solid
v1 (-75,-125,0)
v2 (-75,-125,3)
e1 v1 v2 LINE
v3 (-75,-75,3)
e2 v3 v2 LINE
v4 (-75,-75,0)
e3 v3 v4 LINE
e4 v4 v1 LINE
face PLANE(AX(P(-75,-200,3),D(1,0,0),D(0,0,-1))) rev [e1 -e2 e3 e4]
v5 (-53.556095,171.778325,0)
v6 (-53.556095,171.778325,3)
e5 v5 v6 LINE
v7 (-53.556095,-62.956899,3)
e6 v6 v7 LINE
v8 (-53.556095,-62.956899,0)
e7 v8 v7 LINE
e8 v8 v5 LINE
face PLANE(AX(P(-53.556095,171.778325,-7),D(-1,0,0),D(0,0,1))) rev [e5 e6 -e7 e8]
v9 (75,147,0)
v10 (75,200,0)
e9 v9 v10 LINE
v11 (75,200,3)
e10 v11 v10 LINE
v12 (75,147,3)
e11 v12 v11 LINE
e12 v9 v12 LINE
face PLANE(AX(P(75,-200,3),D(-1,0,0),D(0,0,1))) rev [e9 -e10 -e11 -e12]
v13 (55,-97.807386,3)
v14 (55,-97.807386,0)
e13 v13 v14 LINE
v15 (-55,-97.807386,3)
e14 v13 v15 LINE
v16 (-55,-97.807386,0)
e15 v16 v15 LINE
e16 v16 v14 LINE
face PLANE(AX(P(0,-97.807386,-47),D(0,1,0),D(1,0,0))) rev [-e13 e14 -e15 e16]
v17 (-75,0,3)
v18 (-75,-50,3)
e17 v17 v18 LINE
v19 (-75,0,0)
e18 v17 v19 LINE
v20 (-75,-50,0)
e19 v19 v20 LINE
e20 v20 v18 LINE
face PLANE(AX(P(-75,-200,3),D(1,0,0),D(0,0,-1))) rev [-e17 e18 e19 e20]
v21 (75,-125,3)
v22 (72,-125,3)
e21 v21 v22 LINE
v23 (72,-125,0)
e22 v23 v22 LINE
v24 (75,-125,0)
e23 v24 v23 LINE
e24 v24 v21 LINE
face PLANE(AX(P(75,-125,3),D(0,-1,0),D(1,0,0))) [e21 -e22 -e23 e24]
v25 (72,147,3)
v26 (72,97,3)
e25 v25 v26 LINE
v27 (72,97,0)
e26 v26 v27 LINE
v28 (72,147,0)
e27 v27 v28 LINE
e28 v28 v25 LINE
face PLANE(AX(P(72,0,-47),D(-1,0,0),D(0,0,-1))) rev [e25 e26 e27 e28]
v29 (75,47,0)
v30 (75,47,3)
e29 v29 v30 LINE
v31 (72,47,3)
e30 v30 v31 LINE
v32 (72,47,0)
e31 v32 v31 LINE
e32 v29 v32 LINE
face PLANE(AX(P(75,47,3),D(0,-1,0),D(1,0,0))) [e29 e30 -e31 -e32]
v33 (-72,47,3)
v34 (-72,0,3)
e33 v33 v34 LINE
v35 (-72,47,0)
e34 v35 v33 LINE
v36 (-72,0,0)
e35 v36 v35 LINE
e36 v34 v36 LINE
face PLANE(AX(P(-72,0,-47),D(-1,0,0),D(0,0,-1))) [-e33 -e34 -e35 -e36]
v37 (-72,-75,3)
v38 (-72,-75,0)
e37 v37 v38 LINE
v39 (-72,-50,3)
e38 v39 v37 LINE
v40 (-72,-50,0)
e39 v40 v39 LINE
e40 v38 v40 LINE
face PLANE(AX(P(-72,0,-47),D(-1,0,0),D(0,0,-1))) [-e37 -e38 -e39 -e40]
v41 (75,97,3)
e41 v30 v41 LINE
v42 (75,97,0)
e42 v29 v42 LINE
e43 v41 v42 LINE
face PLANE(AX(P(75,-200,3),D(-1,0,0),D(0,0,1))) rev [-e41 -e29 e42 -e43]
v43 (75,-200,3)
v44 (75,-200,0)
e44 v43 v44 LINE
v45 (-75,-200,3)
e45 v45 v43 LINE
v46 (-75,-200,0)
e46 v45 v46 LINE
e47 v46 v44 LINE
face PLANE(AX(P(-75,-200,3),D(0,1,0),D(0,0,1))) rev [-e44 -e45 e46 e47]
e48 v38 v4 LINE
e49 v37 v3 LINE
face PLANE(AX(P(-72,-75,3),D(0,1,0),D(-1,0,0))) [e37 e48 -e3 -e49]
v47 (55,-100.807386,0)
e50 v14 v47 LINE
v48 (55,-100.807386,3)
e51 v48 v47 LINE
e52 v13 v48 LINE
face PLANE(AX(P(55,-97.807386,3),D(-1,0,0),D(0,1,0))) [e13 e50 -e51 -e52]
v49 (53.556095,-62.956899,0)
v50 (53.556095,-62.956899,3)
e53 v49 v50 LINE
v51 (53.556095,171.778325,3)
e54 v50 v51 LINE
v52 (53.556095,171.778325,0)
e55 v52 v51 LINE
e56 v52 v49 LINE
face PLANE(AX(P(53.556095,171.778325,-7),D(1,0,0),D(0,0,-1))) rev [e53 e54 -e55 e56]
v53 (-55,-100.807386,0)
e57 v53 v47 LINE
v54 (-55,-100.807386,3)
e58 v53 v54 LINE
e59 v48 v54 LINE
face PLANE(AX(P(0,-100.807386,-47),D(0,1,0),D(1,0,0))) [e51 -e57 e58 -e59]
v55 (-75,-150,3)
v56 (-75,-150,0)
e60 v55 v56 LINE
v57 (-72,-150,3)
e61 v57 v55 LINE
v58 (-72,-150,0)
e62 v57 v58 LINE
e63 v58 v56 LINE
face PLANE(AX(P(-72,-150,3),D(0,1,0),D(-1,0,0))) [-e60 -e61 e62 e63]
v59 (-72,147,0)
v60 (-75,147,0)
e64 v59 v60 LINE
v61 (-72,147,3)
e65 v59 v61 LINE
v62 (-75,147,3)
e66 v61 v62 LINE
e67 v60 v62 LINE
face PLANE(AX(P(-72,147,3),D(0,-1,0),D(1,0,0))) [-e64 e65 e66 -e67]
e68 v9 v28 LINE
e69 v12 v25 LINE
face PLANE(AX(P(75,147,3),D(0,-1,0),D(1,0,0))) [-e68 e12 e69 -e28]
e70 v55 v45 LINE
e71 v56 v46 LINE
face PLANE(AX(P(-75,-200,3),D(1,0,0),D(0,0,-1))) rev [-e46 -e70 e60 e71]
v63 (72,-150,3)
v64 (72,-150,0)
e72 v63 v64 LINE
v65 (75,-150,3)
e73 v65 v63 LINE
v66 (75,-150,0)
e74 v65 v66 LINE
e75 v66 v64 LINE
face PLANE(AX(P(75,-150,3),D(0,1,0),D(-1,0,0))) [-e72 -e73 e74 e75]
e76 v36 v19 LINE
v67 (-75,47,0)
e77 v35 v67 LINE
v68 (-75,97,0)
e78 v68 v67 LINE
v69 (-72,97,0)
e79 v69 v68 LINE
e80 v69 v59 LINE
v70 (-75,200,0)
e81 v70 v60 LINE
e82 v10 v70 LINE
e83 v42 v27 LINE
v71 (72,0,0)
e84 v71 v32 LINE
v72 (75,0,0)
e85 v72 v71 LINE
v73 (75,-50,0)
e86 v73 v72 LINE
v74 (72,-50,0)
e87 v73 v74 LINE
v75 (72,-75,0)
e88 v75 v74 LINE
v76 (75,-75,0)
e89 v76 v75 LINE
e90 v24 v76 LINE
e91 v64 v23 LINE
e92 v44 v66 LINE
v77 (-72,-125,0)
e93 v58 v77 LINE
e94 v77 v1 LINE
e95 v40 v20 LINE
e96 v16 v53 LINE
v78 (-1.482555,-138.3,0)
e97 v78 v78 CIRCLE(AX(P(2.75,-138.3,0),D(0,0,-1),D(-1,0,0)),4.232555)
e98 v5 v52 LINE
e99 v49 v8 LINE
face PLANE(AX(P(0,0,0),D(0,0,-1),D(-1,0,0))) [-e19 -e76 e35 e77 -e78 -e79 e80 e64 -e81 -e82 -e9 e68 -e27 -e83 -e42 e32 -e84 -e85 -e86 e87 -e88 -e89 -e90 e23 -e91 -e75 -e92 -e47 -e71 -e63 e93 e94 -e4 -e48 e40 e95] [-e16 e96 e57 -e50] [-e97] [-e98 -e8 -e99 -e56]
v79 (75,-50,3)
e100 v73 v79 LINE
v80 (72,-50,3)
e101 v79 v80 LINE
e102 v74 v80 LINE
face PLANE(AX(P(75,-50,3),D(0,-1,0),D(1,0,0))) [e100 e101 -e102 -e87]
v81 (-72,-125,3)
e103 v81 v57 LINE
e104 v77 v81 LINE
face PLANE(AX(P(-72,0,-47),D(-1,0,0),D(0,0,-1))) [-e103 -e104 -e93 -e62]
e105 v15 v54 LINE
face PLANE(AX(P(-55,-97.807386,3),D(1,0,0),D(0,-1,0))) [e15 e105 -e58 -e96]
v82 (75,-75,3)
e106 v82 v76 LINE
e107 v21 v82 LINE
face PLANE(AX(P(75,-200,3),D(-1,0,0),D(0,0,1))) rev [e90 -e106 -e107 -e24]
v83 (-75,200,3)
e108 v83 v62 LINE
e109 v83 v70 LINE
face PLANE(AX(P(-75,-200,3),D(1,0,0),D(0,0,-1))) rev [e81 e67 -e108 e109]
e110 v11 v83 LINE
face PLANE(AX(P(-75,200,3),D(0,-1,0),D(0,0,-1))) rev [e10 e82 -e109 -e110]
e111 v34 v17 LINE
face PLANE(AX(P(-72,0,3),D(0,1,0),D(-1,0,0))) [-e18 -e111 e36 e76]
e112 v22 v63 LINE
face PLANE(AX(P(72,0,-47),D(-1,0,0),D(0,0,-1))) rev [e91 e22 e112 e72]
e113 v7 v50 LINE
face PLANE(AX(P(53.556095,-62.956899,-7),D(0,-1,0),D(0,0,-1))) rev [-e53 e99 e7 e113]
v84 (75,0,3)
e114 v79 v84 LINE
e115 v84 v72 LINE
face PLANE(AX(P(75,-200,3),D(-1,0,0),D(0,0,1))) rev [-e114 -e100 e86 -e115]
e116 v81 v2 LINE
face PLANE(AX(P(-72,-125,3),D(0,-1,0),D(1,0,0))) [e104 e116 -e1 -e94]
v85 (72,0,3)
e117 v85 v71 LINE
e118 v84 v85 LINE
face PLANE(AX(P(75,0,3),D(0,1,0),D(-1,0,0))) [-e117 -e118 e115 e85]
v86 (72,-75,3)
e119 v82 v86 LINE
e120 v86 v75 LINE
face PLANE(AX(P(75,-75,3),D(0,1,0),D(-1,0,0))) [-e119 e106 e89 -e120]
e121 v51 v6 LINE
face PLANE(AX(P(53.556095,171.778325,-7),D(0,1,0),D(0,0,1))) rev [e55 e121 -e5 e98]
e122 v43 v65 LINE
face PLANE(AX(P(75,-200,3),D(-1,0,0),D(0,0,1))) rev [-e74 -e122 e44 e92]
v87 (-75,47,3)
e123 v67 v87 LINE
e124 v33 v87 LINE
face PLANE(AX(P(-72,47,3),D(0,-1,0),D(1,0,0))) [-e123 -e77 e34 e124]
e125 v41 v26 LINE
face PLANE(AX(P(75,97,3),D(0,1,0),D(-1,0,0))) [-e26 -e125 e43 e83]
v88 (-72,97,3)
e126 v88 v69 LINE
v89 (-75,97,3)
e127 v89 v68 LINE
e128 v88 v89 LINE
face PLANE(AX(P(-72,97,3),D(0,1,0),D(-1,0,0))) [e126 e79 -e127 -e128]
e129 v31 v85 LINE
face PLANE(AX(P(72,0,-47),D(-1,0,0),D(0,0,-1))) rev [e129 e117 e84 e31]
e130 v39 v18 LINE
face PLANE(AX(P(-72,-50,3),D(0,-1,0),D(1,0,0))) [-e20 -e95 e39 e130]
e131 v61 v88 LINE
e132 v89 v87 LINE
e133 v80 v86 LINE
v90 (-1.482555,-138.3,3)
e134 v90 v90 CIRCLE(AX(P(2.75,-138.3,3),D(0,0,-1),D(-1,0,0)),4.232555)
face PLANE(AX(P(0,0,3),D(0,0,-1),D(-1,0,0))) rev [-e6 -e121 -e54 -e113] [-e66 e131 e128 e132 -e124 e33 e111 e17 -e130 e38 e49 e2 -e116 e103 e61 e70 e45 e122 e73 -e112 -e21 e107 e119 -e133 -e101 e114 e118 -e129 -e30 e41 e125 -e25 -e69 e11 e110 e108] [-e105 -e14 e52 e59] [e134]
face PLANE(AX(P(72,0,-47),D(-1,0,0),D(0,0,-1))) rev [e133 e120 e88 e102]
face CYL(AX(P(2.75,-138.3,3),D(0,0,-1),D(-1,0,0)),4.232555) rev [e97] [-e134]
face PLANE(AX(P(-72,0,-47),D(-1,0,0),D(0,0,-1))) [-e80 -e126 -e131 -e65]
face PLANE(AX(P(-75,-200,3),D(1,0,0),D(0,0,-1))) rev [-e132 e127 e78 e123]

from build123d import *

# Parameters (mm, degrees)
SKETCH1_W             = 150
SKETCH1_H             = 400
BOSS_EXTRUDE1_DEPTH   = 3
SKETCH6_R             = 4.232555097
CUT_EXTRUDE5_DEPTH    = 3
CAVITY1_START         = -75
CAVITY1_OUTLINE_W     = 50
CAVITY1_OUTLINE_H     = 3
CAVITY1_OUTLINE_W_2   = 47
CAVITY1_OUTLINE_W_3   = 25
CAVITY1_DEPTH         = 3
CAVITY1_START_2       = 72
CAVITY1_2_OUTLINE_W   = 50
CAVITY1_2_OUTLINE_H   = 3
CAVITY1_2_OUTLINE_W_2 = 47
CAVITY1_2_OUTLINE_W_3 = 25
CAVITY1_2_DEPTH       = 3
CAVITY1_START_3       = -55
CAVITY1_3_OUTLINE_W   = 3
CAVITY1_3_OUTLINE_H   = 3
CAVITY1_3_DEPTH       = 110
SKETCH7_W             = 107.112189612
SKETCH7_H             = 234.735224044
CUT_EXTRUDE6_DEPTH    = 10


# Read off the part's stored shape, not the designer's step: Cavity1
with BuildPart() as part:
    # Sketch1 → Boss-Extrude1 (new body)
    with BuildSketch(Plane.XY):
        Rectangle(SKETCH1_W, SKETCH1_H)
    extrude(amount=BOSS_EXTRUDE1_DEPTH)

    # Sketch6 → Cut-Extrude5 (cut)
    with BuildSketch(Plane(origin=(0, 0, 0), x_dir=(-1, 0, 0), z_dir=(0, 0, -1))):
        with Locations((-2.75, -138.3)):
            Circle(SKETCH6_R)
    extrude(amount=-CUT_EXTRUDE5_DEPTH, mode=Mode.SUBTRACT)

    # Cavity1 outline → Cavity1 (cut)
    with BuildSketch(Plane.YZ.offset(CAVITY1_START)):
        with Locations((122, 1.5)):
            Rectangle(CAVITY1_OUTLINE_W, CAVITY1_OUTLINE_H)
        with Locations((23.5, 1.5)):
            Rectangle(CAVITY1_OUTLINE_W_2, CAVITY1_OUTLINE_H)
        with Locations((-62.5, 1.5)):
            Rectangle(CAVITY1_OUTLINE_W_3, CAVITY1_OUTLINE_H)
        with Locations((-137.5, 1.5)):
            Rectangle(CAVITY1_OUTLINE_W_3, CAVITY1_OUTLINE_H)
    extrude(amount=CAVITY1_DEPTH, mode=Mode.SUBTRACT)

    # Cavity1 2 outline → Cavity1 2 (cut)
    with BuildSketch(Plane.YZ.offset(CAVITY1_START_2)):
        with Locations((122, 1.5)):
            Rectangle(CAVITY1_2_OUTLINE_W, CAVITY1_2_OUTLINE_H)
        with Locations((23.5, 1.5)):
            Rectangle(CAVITY1_2_OUTLINE_W_2, CAVITY1_2_OUTLINE_H)
        with Locations((-62.5, 1.5)):
            Rectangle(CAVITY1_2_OUTLINE_W_3, CAVITY1_2_OUTLINE_H)
        with Locations((-137.5, 1.5)):
            Rectangle(CAVITY1_2_OUTLINE_W_3, CAVITY1_2_OUTLINE_H)
    extrude(amount=CAVITY1_2_DEPTH, mode=Mode.SUBTRACT)

    # Cavity1 3 outline → Cavity1 3 (cut)
    with BuildSketch(Plane.YZ.offset(CAVITY1_START_3)):
        with Locations((-99.307385879, 1.5)):
            Rectangle(CAVITY1_3_OUTLINE_W, CAVITY1_3_OUTLINE_H)
    extrude(amount=CAVITY1_3_DEPTH, mode=Mode.SUBTRACT)

    # Sketch7 → Cut-Extrude6 (cut)
    with BuildSketch(Plane.XY.offset(3)):
        with Locations((0, 54.41071334)):
            Rectangle(SKETCH7_W, SKETCH7_H)
    extrude(amount=-CUT_EXTRUDE6_DEPTH, mode=Mode.SUBTRACT)


solid = part.part
